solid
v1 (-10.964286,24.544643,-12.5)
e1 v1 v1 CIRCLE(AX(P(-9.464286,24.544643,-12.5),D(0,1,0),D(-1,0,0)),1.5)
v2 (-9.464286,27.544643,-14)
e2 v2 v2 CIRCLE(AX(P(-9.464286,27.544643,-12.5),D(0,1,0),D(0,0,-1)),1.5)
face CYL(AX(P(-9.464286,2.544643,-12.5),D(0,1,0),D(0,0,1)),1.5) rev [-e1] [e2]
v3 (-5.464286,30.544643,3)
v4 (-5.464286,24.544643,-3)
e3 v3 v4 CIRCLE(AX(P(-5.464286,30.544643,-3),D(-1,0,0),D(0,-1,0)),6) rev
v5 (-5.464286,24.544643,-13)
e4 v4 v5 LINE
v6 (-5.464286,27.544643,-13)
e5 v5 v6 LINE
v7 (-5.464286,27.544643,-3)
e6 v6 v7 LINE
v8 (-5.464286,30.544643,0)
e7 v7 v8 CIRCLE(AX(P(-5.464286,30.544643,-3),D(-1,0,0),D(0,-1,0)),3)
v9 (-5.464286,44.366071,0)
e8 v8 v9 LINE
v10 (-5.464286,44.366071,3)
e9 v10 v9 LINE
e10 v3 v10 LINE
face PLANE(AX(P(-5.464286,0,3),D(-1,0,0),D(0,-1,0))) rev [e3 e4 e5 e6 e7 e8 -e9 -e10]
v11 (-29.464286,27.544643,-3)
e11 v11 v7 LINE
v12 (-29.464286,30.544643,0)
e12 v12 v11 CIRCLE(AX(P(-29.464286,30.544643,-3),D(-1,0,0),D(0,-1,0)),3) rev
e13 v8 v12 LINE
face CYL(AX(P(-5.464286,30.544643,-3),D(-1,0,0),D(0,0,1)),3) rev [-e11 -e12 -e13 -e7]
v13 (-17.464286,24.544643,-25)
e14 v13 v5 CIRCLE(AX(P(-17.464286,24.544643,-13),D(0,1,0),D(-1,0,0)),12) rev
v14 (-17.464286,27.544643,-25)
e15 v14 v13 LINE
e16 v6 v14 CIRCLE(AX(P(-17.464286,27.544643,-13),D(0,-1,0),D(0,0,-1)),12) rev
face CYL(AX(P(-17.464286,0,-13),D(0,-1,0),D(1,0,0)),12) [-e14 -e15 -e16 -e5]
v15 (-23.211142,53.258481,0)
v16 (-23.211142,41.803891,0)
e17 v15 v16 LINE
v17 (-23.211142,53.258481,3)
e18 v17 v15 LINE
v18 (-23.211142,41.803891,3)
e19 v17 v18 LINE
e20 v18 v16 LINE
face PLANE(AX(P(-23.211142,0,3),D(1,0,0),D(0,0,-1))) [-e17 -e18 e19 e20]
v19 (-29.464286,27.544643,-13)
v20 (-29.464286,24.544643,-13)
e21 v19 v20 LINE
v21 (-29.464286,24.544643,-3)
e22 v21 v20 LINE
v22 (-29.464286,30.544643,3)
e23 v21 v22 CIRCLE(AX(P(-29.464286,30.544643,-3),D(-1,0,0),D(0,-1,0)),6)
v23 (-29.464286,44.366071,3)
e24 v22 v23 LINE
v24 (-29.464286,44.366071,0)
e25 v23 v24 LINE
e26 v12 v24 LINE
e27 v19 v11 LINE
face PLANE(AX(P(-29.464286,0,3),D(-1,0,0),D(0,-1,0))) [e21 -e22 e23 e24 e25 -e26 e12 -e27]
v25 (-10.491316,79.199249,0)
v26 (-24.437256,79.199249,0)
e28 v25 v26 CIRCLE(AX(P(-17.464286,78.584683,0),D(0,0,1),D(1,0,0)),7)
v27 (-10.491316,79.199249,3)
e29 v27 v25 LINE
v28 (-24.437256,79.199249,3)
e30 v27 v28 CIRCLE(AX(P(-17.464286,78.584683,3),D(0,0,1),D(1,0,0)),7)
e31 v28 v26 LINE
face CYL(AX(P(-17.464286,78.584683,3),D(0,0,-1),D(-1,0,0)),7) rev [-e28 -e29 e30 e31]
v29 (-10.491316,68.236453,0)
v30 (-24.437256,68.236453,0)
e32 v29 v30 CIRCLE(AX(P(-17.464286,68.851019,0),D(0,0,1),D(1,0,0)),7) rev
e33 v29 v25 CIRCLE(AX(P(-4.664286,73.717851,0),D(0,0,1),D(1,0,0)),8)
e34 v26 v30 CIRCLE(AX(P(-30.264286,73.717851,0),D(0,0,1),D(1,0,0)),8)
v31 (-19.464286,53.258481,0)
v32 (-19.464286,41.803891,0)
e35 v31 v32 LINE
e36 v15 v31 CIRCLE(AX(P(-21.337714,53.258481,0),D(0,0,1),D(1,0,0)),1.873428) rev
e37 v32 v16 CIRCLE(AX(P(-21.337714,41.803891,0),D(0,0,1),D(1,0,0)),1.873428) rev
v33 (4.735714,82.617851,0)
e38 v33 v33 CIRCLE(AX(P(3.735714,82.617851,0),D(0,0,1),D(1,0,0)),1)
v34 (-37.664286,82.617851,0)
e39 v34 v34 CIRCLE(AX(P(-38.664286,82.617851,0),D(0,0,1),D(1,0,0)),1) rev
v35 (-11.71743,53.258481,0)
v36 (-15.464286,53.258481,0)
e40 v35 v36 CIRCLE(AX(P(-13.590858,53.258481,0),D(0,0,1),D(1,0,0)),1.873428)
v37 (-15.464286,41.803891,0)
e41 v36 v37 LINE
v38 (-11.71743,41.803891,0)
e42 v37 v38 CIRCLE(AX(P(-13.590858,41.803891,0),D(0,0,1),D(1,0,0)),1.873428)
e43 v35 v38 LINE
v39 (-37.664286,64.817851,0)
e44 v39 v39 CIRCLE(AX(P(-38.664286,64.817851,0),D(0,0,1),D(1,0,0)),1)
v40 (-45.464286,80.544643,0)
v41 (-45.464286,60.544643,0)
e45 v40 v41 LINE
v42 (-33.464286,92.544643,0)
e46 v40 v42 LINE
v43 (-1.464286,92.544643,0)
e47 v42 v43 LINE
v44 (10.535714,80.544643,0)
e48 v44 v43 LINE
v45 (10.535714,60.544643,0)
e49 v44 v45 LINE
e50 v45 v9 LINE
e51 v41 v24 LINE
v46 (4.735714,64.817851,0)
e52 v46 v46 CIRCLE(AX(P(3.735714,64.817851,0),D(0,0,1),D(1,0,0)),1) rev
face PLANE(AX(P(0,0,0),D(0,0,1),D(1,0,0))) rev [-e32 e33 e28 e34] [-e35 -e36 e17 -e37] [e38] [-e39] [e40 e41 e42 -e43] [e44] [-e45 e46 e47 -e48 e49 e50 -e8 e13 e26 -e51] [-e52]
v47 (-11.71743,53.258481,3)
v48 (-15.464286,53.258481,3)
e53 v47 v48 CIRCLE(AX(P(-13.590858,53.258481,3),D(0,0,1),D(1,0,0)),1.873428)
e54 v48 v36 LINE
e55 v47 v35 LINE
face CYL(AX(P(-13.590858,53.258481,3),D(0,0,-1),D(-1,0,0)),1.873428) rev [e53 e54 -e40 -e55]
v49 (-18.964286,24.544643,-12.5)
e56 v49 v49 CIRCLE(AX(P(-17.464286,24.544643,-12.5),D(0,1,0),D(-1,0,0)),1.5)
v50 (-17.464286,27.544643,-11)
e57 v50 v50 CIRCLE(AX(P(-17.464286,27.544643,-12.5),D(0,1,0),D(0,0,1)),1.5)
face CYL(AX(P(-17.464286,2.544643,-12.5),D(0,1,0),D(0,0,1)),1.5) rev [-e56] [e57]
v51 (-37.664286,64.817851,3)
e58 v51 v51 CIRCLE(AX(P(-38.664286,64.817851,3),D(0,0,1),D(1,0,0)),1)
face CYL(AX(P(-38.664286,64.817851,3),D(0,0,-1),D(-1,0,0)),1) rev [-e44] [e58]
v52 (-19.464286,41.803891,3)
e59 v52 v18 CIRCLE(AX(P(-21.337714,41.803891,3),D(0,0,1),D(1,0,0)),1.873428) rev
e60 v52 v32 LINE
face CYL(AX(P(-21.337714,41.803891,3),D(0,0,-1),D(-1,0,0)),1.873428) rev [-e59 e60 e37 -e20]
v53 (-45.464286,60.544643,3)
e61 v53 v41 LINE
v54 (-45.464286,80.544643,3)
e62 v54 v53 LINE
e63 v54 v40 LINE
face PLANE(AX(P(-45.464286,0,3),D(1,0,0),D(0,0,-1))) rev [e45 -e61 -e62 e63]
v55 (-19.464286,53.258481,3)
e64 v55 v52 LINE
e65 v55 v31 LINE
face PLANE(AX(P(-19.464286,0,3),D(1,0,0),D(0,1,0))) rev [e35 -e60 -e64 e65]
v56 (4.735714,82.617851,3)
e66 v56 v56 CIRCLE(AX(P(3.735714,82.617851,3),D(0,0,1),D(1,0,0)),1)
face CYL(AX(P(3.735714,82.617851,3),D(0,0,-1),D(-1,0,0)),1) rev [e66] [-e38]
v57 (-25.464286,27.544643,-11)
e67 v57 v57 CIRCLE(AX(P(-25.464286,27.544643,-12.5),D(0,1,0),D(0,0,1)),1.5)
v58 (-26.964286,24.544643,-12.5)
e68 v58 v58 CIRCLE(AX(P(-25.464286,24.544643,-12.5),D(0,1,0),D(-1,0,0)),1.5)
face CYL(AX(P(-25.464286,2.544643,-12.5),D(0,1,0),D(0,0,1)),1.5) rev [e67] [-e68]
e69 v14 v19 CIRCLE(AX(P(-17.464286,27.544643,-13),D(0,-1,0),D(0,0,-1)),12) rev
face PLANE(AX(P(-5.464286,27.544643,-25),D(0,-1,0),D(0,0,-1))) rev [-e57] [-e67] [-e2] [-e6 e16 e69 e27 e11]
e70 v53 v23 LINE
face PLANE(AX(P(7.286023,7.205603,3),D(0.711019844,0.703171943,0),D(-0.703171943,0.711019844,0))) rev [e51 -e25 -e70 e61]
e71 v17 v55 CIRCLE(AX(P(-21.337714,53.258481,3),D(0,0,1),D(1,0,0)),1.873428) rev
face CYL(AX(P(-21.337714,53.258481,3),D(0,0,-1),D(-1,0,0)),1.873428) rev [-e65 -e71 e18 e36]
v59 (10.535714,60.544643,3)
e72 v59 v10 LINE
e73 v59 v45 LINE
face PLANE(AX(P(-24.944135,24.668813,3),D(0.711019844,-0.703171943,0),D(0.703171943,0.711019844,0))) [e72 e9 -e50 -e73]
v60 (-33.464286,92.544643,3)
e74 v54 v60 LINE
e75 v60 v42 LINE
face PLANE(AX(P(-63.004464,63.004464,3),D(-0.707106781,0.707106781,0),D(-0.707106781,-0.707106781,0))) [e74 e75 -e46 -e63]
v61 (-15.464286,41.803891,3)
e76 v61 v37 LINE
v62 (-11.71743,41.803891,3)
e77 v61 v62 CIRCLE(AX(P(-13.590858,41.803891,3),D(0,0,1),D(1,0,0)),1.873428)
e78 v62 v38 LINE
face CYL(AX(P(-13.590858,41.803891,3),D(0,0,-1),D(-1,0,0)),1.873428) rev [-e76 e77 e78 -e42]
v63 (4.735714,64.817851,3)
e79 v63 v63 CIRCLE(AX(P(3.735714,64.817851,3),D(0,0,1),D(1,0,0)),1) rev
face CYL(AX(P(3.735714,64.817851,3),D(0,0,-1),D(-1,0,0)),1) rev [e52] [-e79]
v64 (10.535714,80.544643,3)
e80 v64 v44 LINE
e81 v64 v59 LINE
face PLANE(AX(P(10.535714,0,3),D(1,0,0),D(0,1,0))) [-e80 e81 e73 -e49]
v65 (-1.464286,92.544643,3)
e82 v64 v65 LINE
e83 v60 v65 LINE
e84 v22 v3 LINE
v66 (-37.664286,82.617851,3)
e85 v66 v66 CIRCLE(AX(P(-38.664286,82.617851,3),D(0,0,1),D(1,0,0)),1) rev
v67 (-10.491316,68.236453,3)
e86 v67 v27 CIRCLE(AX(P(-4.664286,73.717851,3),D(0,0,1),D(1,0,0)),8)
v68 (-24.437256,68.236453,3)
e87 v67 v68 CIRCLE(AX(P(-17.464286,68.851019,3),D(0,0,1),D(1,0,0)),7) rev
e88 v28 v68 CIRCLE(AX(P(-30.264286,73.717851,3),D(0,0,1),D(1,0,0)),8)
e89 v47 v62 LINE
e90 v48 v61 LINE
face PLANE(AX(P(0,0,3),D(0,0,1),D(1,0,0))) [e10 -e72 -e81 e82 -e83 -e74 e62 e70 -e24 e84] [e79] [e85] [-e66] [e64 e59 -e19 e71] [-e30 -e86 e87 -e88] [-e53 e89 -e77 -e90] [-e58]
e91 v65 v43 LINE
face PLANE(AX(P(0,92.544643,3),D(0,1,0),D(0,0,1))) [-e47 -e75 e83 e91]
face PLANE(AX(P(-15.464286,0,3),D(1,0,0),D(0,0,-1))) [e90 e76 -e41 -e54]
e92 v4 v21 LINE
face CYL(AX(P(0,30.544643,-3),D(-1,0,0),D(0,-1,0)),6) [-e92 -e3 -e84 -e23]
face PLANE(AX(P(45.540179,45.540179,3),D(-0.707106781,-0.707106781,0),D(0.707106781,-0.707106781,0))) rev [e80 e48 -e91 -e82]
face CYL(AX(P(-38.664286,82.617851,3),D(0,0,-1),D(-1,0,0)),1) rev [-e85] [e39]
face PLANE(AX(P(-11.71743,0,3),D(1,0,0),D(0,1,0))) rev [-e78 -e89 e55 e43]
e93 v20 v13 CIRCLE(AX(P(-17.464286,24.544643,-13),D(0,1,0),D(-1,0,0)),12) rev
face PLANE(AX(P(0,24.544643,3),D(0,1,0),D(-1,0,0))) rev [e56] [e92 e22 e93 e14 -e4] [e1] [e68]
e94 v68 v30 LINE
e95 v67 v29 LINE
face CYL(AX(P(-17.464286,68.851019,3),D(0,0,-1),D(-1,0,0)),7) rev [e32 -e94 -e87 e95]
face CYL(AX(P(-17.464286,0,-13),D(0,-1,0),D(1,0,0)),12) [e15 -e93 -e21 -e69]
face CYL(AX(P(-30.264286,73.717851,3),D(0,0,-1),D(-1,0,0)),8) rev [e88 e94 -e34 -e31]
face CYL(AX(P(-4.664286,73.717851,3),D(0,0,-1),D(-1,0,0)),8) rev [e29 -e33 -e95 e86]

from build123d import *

# Parameters (mm, degrees)
SKETCH1_R           = 1
BOSS_EXTRUDE1_DEPTH = 3
SKETCH2_W           = 24
SKETCH2_H           = 3
BOSS_EXTRUDE2_DEPTH = 25
FILLET3_R           = 12
SKETCH3_R           = 1.5
CUT_EXTRUDE1_DEPTH  = 25
FILLET5_R           = 3
FILLET6_R           = 6


with BuildPart() as part:
    # Sketch1 → Boss-Extrude1 (new body)
    with BuildSketch(Plane.XY):
        Polygon((-5.464285714, 44.366071429), (10.535714286, 60.544642857), (10.535714286, 80.544642857), (-1.464285714, 92.544642857), (-33.464285714, 92.544642857), (-45.464285714, 80.544642857), (-45.464285714, 60.544642857), (-29.464285714, 44.366071429), (-29.464285714, 24.544642857), (-5.464285714, 24.544642857), align=None)
        with BuildLine():
            Line((-23.211141689, 41.803891012), (-23.211141689, 53.258480522))
            ThreePointArc((-23.211141689, 53.258480522), (-21.337713702, 55.131908509), (-19.464285714, 53.258480522))
            Line((-19.464285714, 53.258480522), (-19.464285714, 41.803891012))
            ThreePointArc((-19.464285714, 41.803891012), (-21.337713702, 39.930463025), (-23.211141689, 41.803891012))
        make_face(mode=Mode.SUBTRACT)
        with BuildLine():
            ThreePointArc((-15.464285714, 53.258480522), (-13.590857727, 55.131908509), (-11.71742974, 53.258480522))
            Line((-11.71742974, 53.258480522), (-11.71742974, 41.803891012))
            ThreePointArc((-11.71742974, 41.803891012), (-13.590857727, 39.930463025), (-15.464285714, 41.803891012))
            Line((-15.464285714, 41.803891012), (-15.464285714, 53.258480522))
        make_face(mode=Mode.SUBTRACT)
        with Locations((-38.664285714, 64.817850901)):
            Circle(SKETCH1_R, mode=Mode.SUBTRACT)
        with BuildLine():
            ThreePointArc((-24.437255613, 79.199248551), (-17.464285714, 85.584683016), (-10.491315816, 79.199248551))
            ThreePointArc((-10.491315816, 79.199248551), (3.335714286, 73.717850901), (-10.491315816, 68.236453251))
            ThreePointArc((-10.491315816, 68.236453251), (-17.464285714, 61.851018785), (-24.437255613, 68.236453251))
            ThreePointArc((-24.437255613, 68.236453251), (-38.264285714, 73.717850901), (-24.437255613, 79.199248551))
        make_face(mode=Mode.SUBTRACT)
        with Locations((-38.664285714, 82.617850901)):
            Circle(SKETCH1_R, mode=Mode.SUBTRACT)
        with Locations((3.735714286, 64.817850901)):
            Circle(SKETCH1_R, mode=Mode.SUBTRACT)
        with Locations((3.735714286, 82.617850901)):
            Circle(SKETCH1_R, mode=Mode.SUBTRACT)
    extrude(amount=BOSS_EXTRUDE1_DEPTH)

    # Sketch2 → Boss-Extrude2 (add)
    with BuildSketch(Plane(origin=(0, 0, 0), x_dir=(-1, 0, 0), z_dir=(0, 0, -1))):
        with Locations((17.464285714, 26.044642857)):
            Rectangle(SKETCH2_W, SKETCH2_H)
    extrude(amount=BOSS_EXTRUDE2_DEPTH)

    # Fillet3
    fillet3_edges = [part.edges().sort_by_distance(p)[0] for p in [
        (-29.464285714, 26.044642857, -25),
        (-5.464285714, 26.044642857, -25),
    ]]
    fillet(fillet3_edges, radius=FILLET3_R - 0.0001)  # a hair under: the kernel refuses the full size

    # Sketch3 → Cut-Extrude1 (cut)
    with BuildSketch(Plane(origin=(0, 27.544642857, 0), x_dir=(1, 0, 0), z_dir=(0, 1, 0))):
        with Locations(Location((-17.464285714, 12.5, 0), (0, 0, 270))):
            Circle(SKETCH3_R)
        with Locations(Location((-25.464285714, 12.5, 0), (0, 0, 270))):
            Circle(SKETCH3_R)
        with Locations(Location((-9.464285714, 12.5, 0), (0, 0, 180))):
            Circle(SKETCH3_R)
    extrude(amount=-CUT_EXTRUDE1_DEPTH, mode=Mode.SUBTRACT)

    # Fillet5
    fillet5_edges = [part.edges().sort_by_distance(p)[0] for p in [
        (-17.464285714, 27.544642857, 0),
    ]]
    fillet(fillet5_edges, radius=FILLET5_R)

    # Fillet6
    fillet6_edges = [part.edges().sort_by_distance(p)[0] for p in [
        (-17.464285714, 24.544642857, 3),
    ]]
    fillet(fillet6_edges, radius=FILLET6_R)


solid = part.part
